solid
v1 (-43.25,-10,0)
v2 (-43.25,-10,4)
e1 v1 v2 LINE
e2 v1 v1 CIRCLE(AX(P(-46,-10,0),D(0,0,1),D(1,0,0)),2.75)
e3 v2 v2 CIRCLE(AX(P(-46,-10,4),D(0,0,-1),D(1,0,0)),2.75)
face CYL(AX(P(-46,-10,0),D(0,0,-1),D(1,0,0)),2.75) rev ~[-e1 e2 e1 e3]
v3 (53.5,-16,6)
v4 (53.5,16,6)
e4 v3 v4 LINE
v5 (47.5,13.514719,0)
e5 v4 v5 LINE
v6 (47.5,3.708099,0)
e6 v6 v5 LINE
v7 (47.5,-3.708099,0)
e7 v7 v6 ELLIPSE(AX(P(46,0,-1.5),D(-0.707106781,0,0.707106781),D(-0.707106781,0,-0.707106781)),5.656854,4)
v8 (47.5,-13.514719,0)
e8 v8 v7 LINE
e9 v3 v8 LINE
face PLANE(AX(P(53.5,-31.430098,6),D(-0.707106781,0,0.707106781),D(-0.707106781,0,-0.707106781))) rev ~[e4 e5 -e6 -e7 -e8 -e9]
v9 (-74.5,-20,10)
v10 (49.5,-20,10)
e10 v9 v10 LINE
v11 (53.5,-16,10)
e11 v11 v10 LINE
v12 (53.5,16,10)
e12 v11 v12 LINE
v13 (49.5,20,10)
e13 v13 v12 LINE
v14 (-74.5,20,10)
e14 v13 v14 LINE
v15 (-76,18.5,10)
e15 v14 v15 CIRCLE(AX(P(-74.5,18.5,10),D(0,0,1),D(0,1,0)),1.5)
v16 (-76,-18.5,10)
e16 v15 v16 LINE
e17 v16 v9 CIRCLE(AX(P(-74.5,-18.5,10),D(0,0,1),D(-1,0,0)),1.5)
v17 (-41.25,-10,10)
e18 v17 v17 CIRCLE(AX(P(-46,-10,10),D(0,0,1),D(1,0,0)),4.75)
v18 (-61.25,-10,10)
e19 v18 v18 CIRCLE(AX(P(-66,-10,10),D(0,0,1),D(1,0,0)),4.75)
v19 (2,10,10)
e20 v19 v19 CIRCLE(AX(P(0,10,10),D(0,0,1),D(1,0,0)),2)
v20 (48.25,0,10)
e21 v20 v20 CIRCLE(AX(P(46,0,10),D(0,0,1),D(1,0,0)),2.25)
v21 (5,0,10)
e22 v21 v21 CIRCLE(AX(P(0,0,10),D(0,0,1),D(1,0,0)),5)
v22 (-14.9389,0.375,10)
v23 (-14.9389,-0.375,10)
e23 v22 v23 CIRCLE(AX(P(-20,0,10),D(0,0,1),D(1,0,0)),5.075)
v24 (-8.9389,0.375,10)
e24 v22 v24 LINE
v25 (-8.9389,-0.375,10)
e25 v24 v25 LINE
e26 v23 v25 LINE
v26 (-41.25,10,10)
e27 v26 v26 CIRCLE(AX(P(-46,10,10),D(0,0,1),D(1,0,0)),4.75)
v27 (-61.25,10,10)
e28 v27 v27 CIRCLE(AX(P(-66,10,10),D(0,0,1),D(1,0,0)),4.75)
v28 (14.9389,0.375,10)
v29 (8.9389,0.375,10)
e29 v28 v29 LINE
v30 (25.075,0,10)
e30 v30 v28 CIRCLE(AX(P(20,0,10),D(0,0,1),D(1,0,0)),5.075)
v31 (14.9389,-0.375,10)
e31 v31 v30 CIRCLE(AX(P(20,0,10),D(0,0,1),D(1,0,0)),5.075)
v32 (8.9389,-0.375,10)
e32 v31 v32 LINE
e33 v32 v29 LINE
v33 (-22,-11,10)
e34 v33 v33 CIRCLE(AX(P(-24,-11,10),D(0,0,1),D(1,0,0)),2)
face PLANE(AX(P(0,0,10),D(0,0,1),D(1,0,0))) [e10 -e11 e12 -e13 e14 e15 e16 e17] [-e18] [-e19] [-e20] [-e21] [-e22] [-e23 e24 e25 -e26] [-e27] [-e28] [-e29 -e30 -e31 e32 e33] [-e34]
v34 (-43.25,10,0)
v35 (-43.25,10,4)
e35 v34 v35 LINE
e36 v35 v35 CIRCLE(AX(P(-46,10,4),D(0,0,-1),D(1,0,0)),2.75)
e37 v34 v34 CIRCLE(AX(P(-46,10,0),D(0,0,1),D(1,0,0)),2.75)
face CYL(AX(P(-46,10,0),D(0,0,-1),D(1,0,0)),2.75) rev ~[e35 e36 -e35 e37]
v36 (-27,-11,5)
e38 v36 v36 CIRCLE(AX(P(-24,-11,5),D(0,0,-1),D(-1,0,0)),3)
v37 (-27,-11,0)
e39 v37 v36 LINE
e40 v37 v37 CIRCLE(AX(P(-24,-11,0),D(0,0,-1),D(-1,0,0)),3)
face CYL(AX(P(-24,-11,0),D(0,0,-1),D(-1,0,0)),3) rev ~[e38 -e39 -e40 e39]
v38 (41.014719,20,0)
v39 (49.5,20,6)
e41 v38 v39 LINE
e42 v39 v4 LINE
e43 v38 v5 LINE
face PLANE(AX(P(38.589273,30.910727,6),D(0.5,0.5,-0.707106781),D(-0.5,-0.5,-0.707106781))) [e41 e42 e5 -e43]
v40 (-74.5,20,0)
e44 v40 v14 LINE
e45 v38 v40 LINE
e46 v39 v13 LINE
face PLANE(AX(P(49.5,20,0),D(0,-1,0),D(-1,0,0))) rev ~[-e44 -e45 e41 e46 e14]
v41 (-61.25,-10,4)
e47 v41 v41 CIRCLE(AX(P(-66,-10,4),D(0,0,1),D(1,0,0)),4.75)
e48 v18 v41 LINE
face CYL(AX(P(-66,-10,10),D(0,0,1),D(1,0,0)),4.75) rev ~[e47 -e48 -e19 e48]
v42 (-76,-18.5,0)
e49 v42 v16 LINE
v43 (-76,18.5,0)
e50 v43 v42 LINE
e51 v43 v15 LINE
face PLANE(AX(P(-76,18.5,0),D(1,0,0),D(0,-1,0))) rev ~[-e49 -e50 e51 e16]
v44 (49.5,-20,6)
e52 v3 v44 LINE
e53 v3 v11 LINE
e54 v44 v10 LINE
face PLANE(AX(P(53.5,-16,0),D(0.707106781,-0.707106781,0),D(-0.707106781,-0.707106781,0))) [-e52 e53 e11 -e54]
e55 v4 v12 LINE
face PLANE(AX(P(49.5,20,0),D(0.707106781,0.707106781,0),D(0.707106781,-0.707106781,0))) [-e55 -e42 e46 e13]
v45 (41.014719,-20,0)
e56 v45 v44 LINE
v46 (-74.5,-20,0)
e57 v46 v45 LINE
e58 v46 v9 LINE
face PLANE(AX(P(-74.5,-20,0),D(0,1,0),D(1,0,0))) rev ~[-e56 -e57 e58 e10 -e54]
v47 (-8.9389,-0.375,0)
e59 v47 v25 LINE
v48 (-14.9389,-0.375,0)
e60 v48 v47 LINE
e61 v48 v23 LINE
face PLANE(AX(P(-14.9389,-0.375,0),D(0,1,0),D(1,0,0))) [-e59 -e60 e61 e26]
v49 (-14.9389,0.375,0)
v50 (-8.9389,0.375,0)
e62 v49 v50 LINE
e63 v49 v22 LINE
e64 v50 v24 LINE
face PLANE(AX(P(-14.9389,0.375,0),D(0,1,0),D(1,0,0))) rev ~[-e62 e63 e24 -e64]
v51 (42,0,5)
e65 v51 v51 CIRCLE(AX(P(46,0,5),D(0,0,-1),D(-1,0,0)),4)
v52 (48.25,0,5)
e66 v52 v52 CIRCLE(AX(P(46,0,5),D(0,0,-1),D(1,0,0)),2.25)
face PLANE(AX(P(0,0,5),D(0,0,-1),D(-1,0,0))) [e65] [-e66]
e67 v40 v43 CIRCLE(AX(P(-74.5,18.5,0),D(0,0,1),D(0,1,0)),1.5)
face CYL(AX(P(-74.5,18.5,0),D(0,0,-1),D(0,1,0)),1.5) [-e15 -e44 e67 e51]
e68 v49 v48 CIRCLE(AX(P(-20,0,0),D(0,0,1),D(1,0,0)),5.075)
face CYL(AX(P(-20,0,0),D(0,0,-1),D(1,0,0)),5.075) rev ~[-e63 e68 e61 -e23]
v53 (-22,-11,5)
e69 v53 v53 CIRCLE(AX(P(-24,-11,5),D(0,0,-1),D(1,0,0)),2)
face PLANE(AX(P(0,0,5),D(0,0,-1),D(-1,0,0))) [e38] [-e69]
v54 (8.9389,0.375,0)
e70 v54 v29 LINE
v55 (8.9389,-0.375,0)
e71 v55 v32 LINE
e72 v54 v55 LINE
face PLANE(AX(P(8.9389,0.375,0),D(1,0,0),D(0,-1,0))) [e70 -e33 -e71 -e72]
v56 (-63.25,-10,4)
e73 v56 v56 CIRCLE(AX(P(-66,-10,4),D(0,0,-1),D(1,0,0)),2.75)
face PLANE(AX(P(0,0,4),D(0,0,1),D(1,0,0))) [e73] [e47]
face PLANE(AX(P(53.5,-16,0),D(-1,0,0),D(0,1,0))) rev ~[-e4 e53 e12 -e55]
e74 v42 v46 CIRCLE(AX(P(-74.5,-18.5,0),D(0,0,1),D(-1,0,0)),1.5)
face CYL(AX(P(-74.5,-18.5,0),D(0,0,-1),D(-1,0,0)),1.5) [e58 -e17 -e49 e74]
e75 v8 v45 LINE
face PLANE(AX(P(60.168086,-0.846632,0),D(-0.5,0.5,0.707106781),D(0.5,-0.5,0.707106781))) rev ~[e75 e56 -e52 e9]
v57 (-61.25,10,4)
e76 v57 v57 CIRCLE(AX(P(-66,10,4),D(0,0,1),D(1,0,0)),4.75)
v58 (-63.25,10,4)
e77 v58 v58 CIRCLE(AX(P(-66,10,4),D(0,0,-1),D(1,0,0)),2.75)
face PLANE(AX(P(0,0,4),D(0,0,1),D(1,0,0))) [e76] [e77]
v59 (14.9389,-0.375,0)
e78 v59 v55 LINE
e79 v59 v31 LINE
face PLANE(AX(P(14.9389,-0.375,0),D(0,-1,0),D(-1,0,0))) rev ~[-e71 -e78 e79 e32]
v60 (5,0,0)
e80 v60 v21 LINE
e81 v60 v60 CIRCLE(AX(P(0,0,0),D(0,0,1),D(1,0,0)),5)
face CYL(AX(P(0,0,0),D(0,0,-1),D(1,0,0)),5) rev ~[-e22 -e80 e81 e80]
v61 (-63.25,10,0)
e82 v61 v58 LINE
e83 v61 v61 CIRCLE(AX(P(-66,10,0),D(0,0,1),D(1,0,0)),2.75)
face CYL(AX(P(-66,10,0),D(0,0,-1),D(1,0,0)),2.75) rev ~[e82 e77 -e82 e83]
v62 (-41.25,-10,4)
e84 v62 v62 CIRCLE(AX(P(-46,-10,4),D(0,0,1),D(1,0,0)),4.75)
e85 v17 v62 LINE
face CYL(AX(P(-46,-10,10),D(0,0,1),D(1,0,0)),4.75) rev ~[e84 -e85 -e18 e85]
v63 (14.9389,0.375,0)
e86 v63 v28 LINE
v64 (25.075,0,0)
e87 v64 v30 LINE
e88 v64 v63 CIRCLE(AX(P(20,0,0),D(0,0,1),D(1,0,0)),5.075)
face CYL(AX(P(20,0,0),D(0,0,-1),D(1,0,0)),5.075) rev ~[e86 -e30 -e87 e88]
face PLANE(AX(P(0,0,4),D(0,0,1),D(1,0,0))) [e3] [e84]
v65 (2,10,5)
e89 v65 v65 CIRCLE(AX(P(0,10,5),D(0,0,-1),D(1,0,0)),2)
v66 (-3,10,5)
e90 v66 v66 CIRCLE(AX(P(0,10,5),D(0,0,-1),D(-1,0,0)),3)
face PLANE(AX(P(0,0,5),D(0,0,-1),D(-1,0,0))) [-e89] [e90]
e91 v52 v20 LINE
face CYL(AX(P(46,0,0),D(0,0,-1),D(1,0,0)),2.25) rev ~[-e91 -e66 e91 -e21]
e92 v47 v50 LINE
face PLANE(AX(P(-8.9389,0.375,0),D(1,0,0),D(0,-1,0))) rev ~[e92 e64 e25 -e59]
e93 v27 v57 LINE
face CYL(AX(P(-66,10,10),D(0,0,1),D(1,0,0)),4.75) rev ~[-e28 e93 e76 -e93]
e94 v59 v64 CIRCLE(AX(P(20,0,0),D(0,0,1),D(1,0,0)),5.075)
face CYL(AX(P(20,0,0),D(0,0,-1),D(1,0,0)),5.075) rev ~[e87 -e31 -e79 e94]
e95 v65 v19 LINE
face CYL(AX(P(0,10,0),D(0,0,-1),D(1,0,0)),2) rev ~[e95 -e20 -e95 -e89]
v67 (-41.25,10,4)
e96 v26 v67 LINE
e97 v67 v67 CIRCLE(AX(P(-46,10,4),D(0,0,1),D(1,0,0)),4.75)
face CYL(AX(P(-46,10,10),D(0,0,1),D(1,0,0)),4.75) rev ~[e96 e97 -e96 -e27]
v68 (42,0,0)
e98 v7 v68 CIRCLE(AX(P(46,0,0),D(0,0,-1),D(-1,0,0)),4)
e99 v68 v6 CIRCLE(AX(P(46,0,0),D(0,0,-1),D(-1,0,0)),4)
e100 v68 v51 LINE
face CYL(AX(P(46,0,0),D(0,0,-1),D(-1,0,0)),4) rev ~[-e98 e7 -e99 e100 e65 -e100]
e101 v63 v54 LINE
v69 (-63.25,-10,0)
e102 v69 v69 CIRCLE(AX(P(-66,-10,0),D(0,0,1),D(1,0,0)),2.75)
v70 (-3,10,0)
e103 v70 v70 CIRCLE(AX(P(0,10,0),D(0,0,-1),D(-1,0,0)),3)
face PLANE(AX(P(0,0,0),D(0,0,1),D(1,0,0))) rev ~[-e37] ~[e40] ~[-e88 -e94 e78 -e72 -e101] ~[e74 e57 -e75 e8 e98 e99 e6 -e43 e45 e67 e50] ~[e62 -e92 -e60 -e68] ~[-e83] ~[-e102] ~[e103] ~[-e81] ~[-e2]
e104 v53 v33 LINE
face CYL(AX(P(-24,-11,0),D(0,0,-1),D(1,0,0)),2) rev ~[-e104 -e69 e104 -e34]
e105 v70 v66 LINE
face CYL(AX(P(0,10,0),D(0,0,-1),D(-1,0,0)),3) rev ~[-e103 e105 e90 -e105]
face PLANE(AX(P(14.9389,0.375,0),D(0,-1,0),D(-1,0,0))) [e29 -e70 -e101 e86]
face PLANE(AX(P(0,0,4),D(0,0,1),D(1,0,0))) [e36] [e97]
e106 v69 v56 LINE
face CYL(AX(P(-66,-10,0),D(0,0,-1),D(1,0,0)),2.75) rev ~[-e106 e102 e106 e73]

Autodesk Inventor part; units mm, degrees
ref_plane "YZ Plane" through (0, 0, 0) normal (1, 0, 0) x (0, 1, 0)
ref_plane "XZ Plane" through (0, 0, 0) normal (0, 1, 0) x (-1, 0, 0)
ref_plane "XY Plane" through (0, 0, 0) normal (0, 0, 1) x (1, 0, 0)
sketch "Sketch1" plane through (0, 0, 0) normal (0, 0, 1) x (1, 0, 0)
  line L0 (49.5, 20) -> (-74.5, 20)
  line L1 (-76, 18.5) -> (-76, -18.5)
  line L2 (-74.5, -20) -> (49.5, -20)
  line L3 (-102.2728, 0) -> (79.4621, 0) construction
  line L4 (0, 28.4349) -> (0, -28.4349) construction
  circle A0 centre (0, 0) radius 5
  circle A1 centre (20, 0) radius 5.075
  line L5 (14.9389, 0.375) -> (8.9389, 0.375)
  line L6 (8.9389, 0.375) -> (8.9389, 0)
  line L7 (14.9389, -0.375) -> (8.9389, -0.375)
  line L8 (8.9389, -0.375) -> (8.9389, 0)
  circle A2 centre (-20, 0) radius 5.075
  line L9 (-14.9389, 0.375) -> (-8.9389, 0.375)
  line L10 (-8.9389, 0.375) -> (-8.9389, 0)
  line L11 (-14.9389, -0.375) -> (-8.9389, -0.375)
  line L12 (-8.9389, -0.375) -> (-8.9389, 0)
  circle A3 centre (0, 10) radius 2
  line L13 (36, 20) -> (36, -20) construction
  circle A4 centre (-24, -11) radius 2
  circle A5 centre (46, 0) radius 2.25
  line L14 (-46, -10) -> (-66, -10) construction
  line L15 (-66, -10) -> (-66, 10) construction
  line L16 (-66, 10) -> (-46, 10) construction
  line L17 (-46, 10) -> (-46, -10) construction
  line L18 (-46, -10) -> (-66, 10) construction
  line L19 (-66, -10) -> (-46, 10) construction
  circle A6 centre (-66, 10) radius 2.75
  circle A7 centre (-46, 10) radius 2.75
  circle A8 centre (-46, -10) radius 2.75
  circle A9 centre (-66, -10) radius 2.75
  line L20 (0, 15) -> (-45, 15) construction
  line L21 (-45, 15) -> (-45, 0) construction
  line L22 (-45, 0) -> (-30, -15) construction
  line L23 (-30, -15) -> (0, -15) construction
  line L24 (-36, -20) -> (-76, -20) construction
  line L25 (-76, -20) -> (-76, 20) construction
  line L26 (-76, 20) -> (-36, 20) construction
  line L27 (-36, 20) -> (-36, -20) construction
  line L28 (-36, -20) -> (-76, 20) construction
  line L29 (-76, -20) -> (-36, 20) construction
  arc A10 (-76, -18.5) -> (-74.5, -20) centre (-74.5, -18.5) ccw
  arc A11 (-74.5, 20) -> (-76, 18.5) centre (-74.5, 18.5) ccw
  line L30 (53.5, -16) -> (53.5, 16)
  line L31 (53.5, -16) -> (49.5, -20)
  line L32 (49.5, 20) -> (53.5, 16)
  point P0 (0, 0)
  point P1 (-56, 0)
  point P2 (53.5, -20)
  point P3 (53.5, 20)
  point P4 (-14.9389, -0.375)
  point P5 (14.9389, -0.375)
  dimension "d99" = 10.15
  dimension "d44" = 10
  dimension "d46" = 0.75
  dimension "d47" = 6
  dimension "d48" = 40
  dimension "d49" = 4
  dimension "d50" = 10
  dimension "d51" = 16
  dimension "d55" = 11
  dimension "d56" = 4
  dimension "d60" = 10
  dimension "d62" = 20
  dimension "d63" = 10
  dimension "d64" = 5.5
  dimension "d65" = 45
  dimension "d66" = 30
  dimension "d67" = 45
  dimension "d68" = 40
  dimension "d69" = 40
  dimension "d70" = 1.5
  dimension "d73" = 16
  dimension "d86" = 17.5
  dimension "d87" = 40
  dimension "d89" = 4.5
  dimension "d90" = 4
  dimension "d91" = 4
  dimension "d92" = 4
  dimension "d93" = 4
extrude "Vysunutí1" add sketch "Sketch1" along normal blind 10
sketch "Sketch2" plane through (0, 0, 0) normal (0, 0, -1) x (-1, 0, 0)
  circle A0 centre (-46, 0) radius 2.25 construction
  circle A1 centre (-46, 0) radius 2.25 projected
  circle A2 centre (-46, 0) radius 4
  circle A3 centre (0, 10) radius 2 construction
  circle A4 centre (24, -11) radius 2 construction
  circle A5 centre (0, 10) radius 3
  circle A6 centre (24, -11) radius 3
  point P0 (0, 0)
  point P1 (-66, 0)
  dimension "d85" = 6
extrude "Extrusion2" cut sketch "Sketch2" against normal blind 5 contours A1 | A2 | A5 | A6
sketch "Sketch3" plane through (0, 0, 10) normal (0, 0, 1) x (1, 0, 0)
  circle A0 centre (-46, -10) radius 2.75 construction
  circle A1 centre (-66, -10) radius 2.75 construction
  circle A2 centre (-66, 10) radius 2.75 construction
  circle A3 centre (-46, 10) radius 2.75 construction
  circle A4 centre (-46, -10) radius 2.75 construction
  circle A5 centre (-46, -10) radius 4.75
  circle A6 centre (-66, -10) radius 4.75
  circle A7 centre (-66, 10) radius 4.75
  circle A8 centre (-46, 10) radius 4.75
  point P0 (0, 0)
  dimension "d82" = 9.5
extrude "Extrusion3" cut sketch "Sketch3" against normal blind 6
chamfer "Chamfer1" distance 6 angle 45 3 edges at (53.5, 0, 0) (51.5, -18, 0) (51.5, 18, 0)
properties part number "_3DPrint"
